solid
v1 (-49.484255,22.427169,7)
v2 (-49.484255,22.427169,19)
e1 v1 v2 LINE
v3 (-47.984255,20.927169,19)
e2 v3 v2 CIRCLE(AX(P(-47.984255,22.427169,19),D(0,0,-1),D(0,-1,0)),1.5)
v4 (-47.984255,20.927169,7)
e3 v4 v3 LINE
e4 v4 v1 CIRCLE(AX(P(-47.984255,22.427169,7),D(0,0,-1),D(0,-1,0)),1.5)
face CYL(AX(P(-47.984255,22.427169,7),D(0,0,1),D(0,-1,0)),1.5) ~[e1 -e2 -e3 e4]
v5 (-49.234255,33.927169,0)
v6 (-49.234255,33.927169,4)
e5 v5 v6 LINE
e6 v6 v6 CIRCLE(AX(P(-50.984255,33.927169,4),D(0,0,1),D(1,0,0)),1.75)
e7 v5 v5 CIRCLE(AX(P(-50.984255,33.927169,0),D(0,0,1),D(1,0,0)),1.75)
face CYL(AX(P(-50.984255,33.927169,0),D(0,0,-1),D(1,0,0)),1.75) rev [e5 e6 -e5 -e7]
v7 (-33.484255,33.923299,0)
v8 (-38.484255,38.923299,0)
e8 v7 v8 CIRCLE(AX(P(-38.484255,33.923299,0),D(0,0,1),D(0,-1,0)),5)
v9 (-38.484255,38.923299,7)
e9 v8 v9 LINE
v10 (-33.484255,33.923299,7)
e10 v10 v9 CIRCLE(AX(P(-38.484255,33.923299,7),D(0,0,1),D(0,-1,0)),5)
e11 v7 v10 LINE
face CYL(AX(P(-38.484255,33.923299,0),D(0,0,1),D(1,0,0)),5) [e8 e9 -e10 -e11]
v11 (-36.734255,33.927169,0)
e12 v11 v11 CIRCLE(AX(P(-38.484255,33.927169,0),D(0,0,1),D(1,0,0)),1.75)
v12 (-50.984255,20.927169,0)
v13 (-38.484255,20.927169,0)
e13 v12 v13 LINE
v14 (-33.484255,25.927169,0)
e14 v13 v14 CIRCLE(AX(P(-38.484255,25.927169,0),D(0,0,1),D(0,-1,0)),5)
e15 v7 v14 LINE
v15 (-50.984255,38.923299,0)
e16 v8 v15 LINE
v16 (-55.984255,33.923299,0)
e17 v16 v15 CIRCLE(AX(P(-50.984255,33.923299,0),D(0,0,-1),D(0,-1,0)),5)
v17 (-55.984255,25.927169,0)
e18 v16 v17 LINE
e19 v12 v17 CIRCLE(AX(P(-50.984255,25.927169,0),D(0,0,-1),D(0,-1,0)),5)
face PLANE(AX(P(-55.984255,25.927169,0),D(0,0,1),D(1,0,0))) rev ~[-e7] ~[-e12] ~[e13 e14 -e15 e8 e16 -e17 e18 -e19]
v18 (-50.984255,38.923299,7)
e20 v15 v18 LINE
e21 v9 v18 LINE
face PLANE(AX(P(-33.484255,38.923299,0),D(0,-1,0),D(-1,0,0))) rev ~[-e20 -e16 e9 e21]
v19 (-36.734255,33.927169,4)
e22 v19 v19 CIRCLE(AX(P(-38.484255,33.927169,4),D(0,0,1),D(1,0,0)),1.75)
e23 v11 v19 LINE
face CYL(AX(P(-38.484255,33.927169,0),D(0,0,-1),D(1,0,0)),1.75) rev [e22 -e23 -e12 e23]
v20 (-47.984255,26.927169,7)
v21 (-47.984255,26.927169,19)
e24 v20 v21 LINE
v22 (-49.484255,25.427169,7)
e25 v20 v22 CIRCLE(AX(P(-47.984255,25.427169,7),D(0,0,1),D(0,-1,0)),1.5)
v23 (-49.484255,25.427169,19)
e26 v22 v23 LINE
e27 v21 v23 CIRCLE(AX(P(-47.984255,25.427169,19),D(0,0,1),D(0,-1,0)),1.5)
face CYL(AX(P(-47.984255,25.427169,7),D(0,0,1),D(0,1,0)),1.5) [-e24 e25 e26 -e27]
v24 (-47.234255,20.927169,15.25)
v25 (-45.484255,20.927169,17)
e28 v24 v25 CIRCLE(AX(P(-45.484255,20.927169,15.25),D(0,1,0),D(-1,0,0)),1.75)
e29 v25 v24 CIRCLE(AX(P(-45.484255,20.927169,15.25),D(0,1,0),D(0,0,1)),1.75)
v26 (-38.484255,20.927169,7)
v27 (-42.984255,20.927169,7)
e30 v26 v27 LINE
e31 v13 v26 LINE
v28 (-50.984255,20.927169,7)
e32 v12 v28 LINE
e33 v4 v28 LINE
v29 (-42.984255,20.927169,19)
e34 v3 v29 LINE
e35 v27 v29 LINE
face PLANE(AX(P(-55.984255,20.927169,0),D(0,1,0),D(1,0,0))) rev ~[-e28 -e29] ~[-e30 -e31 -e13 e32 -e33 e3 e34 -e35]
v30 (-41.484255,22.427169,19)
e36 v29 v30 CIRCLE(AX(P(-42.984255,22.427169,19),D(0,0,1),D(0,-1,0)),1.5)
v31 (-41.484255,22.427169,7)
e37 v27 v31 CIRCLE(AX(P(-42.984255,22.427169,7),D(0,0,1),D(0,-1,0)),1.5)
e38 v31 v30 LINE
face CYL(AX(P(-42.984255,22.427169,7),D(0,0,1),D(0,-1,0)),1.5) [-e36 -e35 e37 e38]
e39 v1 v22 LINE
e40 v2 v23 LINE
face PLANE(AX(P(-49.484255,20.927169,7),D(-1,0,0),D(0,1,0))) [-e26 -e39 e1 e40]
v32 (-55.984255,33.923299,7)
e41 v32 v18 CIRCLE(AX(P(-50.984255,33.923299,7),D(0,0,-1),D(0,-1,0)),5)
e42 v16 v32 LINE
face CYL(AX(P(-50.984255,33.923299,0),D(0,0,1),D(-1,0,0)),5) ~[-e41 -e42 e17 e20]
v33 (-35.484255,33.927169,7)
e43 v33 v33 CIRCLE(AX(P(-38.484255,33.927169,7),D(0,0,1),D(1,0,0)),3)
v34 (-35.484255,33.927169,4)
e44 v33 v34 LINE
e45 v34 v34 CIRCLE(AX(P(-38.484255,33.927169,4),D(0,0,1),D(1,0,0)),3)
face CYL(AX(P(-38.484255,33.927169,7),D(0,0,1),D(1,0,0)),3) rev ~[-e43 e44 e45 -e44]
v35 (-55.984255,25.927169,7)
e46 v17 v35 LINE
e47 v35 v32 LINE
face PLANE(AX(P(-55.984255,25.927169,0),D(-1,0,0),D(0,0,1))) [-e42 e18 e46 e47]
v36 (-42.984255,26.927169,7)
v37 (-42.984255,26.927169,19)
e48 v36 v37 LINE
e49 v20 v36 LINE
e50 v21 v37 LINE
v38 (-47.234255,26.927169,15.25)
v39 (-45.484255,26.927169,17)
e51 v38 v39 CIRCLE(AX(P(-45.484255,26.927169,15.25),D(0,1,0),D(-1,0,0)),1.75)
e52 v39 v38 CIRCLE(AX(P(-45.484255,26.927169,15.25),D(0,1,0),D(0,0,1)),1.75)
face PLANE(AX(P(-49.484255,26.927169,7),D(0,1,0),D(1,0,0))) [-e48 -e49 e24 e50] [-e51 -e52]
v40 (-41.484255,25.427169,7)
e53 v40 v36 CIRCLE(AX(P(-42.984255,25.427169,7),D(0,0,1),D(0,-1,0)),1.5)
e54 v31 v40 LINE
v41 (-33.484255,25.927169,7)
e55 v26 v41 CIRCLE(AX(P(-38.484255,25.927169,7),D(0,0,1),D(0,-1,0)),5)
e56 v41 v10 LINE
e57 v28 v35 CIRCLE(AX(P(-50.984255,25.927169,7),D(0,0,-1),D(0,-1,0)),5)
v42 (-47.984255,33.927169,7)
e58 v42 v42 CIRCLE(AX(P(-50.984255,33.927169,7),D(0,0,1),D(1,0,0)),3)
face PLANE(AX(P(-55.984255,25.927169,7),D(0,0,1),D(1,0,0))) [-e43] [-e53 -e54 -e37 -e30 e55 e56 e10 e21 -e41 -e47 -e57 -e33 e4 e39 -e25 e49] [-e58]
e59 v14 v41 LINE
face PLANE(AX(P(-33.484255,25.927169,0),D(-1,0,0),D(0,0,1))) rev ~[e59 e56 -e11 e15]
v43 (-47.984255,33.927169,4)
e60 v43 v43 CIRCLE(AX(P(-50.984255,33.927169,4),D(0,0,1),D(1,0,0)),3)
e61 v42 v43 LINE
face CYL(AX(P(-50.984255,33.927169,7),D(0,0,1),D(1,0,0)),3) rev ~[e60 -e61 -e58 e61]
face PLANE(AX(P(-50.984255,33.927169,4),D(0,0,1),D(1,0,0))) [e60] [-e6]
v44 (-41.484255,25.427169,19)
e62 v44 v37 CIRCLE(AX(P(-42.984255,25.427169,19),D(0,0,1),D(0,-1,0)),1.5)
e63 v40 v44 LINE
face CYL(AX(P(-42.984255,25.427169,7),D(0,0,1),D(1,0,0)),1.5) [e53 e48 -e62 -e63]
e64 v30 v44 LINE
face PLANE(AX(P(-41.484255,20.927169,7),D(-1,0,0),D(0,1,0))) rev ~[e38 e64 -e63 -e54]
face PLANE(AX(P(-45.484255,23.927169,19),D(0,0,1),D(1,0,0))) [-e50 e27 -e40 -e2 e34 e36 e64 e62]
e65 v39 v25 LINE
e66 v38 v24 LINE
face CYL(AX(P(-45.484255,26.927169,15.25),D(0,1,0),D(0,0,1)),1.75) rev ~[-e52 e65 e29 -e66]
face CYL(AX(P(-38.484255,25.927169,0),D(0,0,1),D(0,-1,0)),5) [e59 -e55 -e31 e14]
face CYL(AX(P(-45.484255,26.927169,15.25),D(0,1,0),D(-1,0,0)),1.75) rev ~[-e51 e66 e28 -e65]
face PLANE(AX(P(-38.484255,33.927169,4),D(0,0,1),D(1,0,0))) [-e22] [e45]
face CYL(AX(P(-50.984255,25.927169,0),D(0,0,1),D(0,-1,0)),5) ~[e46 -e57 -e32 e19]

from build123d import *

# Parameters (mm, degrees)
F0_R      = 3
F0_R_2    = 1.75
F1_DEPTH  = 7
F3_DEPTH  = 5
F4_W      = 8
F4_H      = 6
F5_DEPTH  = 12
F6_R      = 1.5
F2_R      = 3
F2_R_2    = 1.75
F7_DEPTH  = 3
F8_R      = 5
F10_DEPTH = 25


# Not quite as in the source:
# - a feature names something its author has since deleted; it is built from what else it names


with BuildPart() as f1:
    # F0 (on Top) → F1 (new body)
    with BuildSketch(Plane.XY):
        with BuildLine():
            ThreePointArc((-51.1365796847, 36.9232990628), (-48.9174910641, 36.1016771789), (-47.9842549264, 33.9271686971))
            ThreePointArc((-47.9842549264, 33.9271686971), (-50.9842549264, 30.9271686971), (-53.9842549264, 33.9271686971))
            Line((-53.9842549264, 33.9271686971), (-55.9842549264, 33.9271686971))
            Line((-55.9842549264, 33.9271686971), (-55.9842549264, 28.9271686971))
            Line((-55.9842549264, 28.9271686971), (-35.9842549264, 28.9271686971))
            Line((-35.9842549264, 28.9271686971), (-35.9842549264, 25.9271686971))
            Line((-35.9842549264, 25.9271686971), (-33.4842549264, 25.9271686971))
            Line((-33.4842549264, 25.9271686971), (-33.4842549264, 33.9271686971))
            Line((-33.4842549264, 33.9271686971), (-33.4842549264, 38.9232990628))
            Line((-33.4842549264, 38.9232990628), (-35.9842549264, 38.9232990628))
            Line((-35.9842549264, 38.9232990628), (-51.1365796847, 38.9232990628))
            Line((-51.1365796847, 38.9232990628), (-51.1365796847, 36.9232990628))
        make_face()
        with Locations((-38.4842549264, 33.9271686971)):
            Circle(F0_R, mode=Mode.SUBTRACT)
        with BuildLine():
            ThreePointArc((-53.9842549264, 33.9271686971), (-53.1587634082, 35.9939325595), (-51.1365796847, 36.9232990628))
            Line((-51.1365796847, 36.9232990628), (-51.1365796847, 38.9232990628))
            Line((-51.1365796847, 38.9232990628), (-55.9842549264, 38.9232990628))
            Line((-55.9842549264, 38.9232990628), (-55.9842549264, 33.9271686971))
            Line((-55.9842549264, 33.9271686971), (-53.9842549264, 33.9271686971))
        make_face()
        Polygon((-35.9842549264, 28.9271686971), (-55.9842549264, 28.9271686971), (-55.9842549264, 25.9271686971), (-53.9842549264, 25.9271686971), (-43.9842549264, 25.9271686971), (-35.9842549264, 25.9271686971), align=None)
        with BuildLine():
            ThreePointArc((-53.9842549264, 33.9271686971), (-50.9842549264, 30.9271686971), (-47.9842549264, 33.9271686971))
            ThreePointArc((-47.9842549264, 33.9271686971), (-48.9174910641, 36.1016771789), (-51.1365796847, 36.9232990628))
            ThreePointArc((-51.1365796847, 36.9232990628), (-53.1587634082, 35.9939325595), (-53.9842549264, 33.9271686971))
        make_face()
        with Locations((-50.9842549264, 33.9271686971)):
            Circle(F0_R_2, mode=Mode.SUBTRACT)
        with Locations((-38.4842549264, 33.9271686971)):
            Circle(F0_R)
        with Locations((-38.4842549264, 33.9271686971)):
            Circle(F0_R_2, mode=Mode.SUBTRACT)
    extrude(amount=F1_DEPTH)

    # F3 (add): a face of the model
    f3_faces = [f1.faces().sort_by_distance(p)[0] for p in [
        (-44.7342549264, 25.9271686971, 3.5),
    ]]
    extrude(f3_faces, amount=F3_DEPTH)

    # F4 (on face) → F5 (join)
    with BuildSketch(Plane.XY.offset(7)):
        with Locations((-45.4842549264, 23.9271686971)):
            Rectangle(F4_W, F4_H)
    extrude(amount=F5_DEPTH)

    # F6
    f6_edges = [f1.edges().sort_by_distance(p)[0] for p in [
        (-49.484255, 20.927169, 13),
        (-41.484255, 20.927169, 13),
        (-49.484255, 26.927169, 13),
        (-41.484255, 26.927169, 13),
    ]]
    fillet(f6_edges, radius=F6_R)

    # F2 (on face) → F7 (cut)
    with BuildSketch(Plane.XY.offset(7)):
        with Locations((-50.9842549264, 33.9271686971)):
            Circle(F2_R)
        with Locations((-50.9842549264, 33.9271686971)):
            Circle(F2_R_2, mode=Mode.SUBTRACT)
        with Locations((-38.4842549264, 33.9271686971)):
            Circle(F2_R)
        with Locations((-38.4842549264, 33.9271686971)):
            Circle(F2_R_2, mode=Mode.SUBTRACT)
    extrude(amount=-F7_DEPTH, mode=Mode.SUBTRACT)

    # F8
    f8_edges = [f1.edges().sort_by_distance(p)[0] for p in [
        (-55.984255, 20.927169, 3.5),
        (-55.984255, 38.923299, 3.5),
        (-33.484255, 38.923299, 3.5),
        (-33.484255, 20.927169, 3.5),
    ]]
    fillet(f8_edges, radius=F8_R)

    # F9 (on face) → F10 (cut)
    with BuildSketch(Plane(origin=(0, 26.9271686971, 0), x_dir=(-1, 0, 0), z_dir=(0, 1, 0))):
        with BuildLine():
            ThreePointArc((45.4842549264, 17), (44.2468180594, 14.0125631329), (47.2342549264, 15.25))
            ThreePointArc((47.2342549264, 15.25), (46.7216917935, 16.4874368671), (45.4842549264, 17))
        make_face()
    extrude(amount=-F10_DEPTH, mode=Mode.SUBTRACT)


solid = f1.part
